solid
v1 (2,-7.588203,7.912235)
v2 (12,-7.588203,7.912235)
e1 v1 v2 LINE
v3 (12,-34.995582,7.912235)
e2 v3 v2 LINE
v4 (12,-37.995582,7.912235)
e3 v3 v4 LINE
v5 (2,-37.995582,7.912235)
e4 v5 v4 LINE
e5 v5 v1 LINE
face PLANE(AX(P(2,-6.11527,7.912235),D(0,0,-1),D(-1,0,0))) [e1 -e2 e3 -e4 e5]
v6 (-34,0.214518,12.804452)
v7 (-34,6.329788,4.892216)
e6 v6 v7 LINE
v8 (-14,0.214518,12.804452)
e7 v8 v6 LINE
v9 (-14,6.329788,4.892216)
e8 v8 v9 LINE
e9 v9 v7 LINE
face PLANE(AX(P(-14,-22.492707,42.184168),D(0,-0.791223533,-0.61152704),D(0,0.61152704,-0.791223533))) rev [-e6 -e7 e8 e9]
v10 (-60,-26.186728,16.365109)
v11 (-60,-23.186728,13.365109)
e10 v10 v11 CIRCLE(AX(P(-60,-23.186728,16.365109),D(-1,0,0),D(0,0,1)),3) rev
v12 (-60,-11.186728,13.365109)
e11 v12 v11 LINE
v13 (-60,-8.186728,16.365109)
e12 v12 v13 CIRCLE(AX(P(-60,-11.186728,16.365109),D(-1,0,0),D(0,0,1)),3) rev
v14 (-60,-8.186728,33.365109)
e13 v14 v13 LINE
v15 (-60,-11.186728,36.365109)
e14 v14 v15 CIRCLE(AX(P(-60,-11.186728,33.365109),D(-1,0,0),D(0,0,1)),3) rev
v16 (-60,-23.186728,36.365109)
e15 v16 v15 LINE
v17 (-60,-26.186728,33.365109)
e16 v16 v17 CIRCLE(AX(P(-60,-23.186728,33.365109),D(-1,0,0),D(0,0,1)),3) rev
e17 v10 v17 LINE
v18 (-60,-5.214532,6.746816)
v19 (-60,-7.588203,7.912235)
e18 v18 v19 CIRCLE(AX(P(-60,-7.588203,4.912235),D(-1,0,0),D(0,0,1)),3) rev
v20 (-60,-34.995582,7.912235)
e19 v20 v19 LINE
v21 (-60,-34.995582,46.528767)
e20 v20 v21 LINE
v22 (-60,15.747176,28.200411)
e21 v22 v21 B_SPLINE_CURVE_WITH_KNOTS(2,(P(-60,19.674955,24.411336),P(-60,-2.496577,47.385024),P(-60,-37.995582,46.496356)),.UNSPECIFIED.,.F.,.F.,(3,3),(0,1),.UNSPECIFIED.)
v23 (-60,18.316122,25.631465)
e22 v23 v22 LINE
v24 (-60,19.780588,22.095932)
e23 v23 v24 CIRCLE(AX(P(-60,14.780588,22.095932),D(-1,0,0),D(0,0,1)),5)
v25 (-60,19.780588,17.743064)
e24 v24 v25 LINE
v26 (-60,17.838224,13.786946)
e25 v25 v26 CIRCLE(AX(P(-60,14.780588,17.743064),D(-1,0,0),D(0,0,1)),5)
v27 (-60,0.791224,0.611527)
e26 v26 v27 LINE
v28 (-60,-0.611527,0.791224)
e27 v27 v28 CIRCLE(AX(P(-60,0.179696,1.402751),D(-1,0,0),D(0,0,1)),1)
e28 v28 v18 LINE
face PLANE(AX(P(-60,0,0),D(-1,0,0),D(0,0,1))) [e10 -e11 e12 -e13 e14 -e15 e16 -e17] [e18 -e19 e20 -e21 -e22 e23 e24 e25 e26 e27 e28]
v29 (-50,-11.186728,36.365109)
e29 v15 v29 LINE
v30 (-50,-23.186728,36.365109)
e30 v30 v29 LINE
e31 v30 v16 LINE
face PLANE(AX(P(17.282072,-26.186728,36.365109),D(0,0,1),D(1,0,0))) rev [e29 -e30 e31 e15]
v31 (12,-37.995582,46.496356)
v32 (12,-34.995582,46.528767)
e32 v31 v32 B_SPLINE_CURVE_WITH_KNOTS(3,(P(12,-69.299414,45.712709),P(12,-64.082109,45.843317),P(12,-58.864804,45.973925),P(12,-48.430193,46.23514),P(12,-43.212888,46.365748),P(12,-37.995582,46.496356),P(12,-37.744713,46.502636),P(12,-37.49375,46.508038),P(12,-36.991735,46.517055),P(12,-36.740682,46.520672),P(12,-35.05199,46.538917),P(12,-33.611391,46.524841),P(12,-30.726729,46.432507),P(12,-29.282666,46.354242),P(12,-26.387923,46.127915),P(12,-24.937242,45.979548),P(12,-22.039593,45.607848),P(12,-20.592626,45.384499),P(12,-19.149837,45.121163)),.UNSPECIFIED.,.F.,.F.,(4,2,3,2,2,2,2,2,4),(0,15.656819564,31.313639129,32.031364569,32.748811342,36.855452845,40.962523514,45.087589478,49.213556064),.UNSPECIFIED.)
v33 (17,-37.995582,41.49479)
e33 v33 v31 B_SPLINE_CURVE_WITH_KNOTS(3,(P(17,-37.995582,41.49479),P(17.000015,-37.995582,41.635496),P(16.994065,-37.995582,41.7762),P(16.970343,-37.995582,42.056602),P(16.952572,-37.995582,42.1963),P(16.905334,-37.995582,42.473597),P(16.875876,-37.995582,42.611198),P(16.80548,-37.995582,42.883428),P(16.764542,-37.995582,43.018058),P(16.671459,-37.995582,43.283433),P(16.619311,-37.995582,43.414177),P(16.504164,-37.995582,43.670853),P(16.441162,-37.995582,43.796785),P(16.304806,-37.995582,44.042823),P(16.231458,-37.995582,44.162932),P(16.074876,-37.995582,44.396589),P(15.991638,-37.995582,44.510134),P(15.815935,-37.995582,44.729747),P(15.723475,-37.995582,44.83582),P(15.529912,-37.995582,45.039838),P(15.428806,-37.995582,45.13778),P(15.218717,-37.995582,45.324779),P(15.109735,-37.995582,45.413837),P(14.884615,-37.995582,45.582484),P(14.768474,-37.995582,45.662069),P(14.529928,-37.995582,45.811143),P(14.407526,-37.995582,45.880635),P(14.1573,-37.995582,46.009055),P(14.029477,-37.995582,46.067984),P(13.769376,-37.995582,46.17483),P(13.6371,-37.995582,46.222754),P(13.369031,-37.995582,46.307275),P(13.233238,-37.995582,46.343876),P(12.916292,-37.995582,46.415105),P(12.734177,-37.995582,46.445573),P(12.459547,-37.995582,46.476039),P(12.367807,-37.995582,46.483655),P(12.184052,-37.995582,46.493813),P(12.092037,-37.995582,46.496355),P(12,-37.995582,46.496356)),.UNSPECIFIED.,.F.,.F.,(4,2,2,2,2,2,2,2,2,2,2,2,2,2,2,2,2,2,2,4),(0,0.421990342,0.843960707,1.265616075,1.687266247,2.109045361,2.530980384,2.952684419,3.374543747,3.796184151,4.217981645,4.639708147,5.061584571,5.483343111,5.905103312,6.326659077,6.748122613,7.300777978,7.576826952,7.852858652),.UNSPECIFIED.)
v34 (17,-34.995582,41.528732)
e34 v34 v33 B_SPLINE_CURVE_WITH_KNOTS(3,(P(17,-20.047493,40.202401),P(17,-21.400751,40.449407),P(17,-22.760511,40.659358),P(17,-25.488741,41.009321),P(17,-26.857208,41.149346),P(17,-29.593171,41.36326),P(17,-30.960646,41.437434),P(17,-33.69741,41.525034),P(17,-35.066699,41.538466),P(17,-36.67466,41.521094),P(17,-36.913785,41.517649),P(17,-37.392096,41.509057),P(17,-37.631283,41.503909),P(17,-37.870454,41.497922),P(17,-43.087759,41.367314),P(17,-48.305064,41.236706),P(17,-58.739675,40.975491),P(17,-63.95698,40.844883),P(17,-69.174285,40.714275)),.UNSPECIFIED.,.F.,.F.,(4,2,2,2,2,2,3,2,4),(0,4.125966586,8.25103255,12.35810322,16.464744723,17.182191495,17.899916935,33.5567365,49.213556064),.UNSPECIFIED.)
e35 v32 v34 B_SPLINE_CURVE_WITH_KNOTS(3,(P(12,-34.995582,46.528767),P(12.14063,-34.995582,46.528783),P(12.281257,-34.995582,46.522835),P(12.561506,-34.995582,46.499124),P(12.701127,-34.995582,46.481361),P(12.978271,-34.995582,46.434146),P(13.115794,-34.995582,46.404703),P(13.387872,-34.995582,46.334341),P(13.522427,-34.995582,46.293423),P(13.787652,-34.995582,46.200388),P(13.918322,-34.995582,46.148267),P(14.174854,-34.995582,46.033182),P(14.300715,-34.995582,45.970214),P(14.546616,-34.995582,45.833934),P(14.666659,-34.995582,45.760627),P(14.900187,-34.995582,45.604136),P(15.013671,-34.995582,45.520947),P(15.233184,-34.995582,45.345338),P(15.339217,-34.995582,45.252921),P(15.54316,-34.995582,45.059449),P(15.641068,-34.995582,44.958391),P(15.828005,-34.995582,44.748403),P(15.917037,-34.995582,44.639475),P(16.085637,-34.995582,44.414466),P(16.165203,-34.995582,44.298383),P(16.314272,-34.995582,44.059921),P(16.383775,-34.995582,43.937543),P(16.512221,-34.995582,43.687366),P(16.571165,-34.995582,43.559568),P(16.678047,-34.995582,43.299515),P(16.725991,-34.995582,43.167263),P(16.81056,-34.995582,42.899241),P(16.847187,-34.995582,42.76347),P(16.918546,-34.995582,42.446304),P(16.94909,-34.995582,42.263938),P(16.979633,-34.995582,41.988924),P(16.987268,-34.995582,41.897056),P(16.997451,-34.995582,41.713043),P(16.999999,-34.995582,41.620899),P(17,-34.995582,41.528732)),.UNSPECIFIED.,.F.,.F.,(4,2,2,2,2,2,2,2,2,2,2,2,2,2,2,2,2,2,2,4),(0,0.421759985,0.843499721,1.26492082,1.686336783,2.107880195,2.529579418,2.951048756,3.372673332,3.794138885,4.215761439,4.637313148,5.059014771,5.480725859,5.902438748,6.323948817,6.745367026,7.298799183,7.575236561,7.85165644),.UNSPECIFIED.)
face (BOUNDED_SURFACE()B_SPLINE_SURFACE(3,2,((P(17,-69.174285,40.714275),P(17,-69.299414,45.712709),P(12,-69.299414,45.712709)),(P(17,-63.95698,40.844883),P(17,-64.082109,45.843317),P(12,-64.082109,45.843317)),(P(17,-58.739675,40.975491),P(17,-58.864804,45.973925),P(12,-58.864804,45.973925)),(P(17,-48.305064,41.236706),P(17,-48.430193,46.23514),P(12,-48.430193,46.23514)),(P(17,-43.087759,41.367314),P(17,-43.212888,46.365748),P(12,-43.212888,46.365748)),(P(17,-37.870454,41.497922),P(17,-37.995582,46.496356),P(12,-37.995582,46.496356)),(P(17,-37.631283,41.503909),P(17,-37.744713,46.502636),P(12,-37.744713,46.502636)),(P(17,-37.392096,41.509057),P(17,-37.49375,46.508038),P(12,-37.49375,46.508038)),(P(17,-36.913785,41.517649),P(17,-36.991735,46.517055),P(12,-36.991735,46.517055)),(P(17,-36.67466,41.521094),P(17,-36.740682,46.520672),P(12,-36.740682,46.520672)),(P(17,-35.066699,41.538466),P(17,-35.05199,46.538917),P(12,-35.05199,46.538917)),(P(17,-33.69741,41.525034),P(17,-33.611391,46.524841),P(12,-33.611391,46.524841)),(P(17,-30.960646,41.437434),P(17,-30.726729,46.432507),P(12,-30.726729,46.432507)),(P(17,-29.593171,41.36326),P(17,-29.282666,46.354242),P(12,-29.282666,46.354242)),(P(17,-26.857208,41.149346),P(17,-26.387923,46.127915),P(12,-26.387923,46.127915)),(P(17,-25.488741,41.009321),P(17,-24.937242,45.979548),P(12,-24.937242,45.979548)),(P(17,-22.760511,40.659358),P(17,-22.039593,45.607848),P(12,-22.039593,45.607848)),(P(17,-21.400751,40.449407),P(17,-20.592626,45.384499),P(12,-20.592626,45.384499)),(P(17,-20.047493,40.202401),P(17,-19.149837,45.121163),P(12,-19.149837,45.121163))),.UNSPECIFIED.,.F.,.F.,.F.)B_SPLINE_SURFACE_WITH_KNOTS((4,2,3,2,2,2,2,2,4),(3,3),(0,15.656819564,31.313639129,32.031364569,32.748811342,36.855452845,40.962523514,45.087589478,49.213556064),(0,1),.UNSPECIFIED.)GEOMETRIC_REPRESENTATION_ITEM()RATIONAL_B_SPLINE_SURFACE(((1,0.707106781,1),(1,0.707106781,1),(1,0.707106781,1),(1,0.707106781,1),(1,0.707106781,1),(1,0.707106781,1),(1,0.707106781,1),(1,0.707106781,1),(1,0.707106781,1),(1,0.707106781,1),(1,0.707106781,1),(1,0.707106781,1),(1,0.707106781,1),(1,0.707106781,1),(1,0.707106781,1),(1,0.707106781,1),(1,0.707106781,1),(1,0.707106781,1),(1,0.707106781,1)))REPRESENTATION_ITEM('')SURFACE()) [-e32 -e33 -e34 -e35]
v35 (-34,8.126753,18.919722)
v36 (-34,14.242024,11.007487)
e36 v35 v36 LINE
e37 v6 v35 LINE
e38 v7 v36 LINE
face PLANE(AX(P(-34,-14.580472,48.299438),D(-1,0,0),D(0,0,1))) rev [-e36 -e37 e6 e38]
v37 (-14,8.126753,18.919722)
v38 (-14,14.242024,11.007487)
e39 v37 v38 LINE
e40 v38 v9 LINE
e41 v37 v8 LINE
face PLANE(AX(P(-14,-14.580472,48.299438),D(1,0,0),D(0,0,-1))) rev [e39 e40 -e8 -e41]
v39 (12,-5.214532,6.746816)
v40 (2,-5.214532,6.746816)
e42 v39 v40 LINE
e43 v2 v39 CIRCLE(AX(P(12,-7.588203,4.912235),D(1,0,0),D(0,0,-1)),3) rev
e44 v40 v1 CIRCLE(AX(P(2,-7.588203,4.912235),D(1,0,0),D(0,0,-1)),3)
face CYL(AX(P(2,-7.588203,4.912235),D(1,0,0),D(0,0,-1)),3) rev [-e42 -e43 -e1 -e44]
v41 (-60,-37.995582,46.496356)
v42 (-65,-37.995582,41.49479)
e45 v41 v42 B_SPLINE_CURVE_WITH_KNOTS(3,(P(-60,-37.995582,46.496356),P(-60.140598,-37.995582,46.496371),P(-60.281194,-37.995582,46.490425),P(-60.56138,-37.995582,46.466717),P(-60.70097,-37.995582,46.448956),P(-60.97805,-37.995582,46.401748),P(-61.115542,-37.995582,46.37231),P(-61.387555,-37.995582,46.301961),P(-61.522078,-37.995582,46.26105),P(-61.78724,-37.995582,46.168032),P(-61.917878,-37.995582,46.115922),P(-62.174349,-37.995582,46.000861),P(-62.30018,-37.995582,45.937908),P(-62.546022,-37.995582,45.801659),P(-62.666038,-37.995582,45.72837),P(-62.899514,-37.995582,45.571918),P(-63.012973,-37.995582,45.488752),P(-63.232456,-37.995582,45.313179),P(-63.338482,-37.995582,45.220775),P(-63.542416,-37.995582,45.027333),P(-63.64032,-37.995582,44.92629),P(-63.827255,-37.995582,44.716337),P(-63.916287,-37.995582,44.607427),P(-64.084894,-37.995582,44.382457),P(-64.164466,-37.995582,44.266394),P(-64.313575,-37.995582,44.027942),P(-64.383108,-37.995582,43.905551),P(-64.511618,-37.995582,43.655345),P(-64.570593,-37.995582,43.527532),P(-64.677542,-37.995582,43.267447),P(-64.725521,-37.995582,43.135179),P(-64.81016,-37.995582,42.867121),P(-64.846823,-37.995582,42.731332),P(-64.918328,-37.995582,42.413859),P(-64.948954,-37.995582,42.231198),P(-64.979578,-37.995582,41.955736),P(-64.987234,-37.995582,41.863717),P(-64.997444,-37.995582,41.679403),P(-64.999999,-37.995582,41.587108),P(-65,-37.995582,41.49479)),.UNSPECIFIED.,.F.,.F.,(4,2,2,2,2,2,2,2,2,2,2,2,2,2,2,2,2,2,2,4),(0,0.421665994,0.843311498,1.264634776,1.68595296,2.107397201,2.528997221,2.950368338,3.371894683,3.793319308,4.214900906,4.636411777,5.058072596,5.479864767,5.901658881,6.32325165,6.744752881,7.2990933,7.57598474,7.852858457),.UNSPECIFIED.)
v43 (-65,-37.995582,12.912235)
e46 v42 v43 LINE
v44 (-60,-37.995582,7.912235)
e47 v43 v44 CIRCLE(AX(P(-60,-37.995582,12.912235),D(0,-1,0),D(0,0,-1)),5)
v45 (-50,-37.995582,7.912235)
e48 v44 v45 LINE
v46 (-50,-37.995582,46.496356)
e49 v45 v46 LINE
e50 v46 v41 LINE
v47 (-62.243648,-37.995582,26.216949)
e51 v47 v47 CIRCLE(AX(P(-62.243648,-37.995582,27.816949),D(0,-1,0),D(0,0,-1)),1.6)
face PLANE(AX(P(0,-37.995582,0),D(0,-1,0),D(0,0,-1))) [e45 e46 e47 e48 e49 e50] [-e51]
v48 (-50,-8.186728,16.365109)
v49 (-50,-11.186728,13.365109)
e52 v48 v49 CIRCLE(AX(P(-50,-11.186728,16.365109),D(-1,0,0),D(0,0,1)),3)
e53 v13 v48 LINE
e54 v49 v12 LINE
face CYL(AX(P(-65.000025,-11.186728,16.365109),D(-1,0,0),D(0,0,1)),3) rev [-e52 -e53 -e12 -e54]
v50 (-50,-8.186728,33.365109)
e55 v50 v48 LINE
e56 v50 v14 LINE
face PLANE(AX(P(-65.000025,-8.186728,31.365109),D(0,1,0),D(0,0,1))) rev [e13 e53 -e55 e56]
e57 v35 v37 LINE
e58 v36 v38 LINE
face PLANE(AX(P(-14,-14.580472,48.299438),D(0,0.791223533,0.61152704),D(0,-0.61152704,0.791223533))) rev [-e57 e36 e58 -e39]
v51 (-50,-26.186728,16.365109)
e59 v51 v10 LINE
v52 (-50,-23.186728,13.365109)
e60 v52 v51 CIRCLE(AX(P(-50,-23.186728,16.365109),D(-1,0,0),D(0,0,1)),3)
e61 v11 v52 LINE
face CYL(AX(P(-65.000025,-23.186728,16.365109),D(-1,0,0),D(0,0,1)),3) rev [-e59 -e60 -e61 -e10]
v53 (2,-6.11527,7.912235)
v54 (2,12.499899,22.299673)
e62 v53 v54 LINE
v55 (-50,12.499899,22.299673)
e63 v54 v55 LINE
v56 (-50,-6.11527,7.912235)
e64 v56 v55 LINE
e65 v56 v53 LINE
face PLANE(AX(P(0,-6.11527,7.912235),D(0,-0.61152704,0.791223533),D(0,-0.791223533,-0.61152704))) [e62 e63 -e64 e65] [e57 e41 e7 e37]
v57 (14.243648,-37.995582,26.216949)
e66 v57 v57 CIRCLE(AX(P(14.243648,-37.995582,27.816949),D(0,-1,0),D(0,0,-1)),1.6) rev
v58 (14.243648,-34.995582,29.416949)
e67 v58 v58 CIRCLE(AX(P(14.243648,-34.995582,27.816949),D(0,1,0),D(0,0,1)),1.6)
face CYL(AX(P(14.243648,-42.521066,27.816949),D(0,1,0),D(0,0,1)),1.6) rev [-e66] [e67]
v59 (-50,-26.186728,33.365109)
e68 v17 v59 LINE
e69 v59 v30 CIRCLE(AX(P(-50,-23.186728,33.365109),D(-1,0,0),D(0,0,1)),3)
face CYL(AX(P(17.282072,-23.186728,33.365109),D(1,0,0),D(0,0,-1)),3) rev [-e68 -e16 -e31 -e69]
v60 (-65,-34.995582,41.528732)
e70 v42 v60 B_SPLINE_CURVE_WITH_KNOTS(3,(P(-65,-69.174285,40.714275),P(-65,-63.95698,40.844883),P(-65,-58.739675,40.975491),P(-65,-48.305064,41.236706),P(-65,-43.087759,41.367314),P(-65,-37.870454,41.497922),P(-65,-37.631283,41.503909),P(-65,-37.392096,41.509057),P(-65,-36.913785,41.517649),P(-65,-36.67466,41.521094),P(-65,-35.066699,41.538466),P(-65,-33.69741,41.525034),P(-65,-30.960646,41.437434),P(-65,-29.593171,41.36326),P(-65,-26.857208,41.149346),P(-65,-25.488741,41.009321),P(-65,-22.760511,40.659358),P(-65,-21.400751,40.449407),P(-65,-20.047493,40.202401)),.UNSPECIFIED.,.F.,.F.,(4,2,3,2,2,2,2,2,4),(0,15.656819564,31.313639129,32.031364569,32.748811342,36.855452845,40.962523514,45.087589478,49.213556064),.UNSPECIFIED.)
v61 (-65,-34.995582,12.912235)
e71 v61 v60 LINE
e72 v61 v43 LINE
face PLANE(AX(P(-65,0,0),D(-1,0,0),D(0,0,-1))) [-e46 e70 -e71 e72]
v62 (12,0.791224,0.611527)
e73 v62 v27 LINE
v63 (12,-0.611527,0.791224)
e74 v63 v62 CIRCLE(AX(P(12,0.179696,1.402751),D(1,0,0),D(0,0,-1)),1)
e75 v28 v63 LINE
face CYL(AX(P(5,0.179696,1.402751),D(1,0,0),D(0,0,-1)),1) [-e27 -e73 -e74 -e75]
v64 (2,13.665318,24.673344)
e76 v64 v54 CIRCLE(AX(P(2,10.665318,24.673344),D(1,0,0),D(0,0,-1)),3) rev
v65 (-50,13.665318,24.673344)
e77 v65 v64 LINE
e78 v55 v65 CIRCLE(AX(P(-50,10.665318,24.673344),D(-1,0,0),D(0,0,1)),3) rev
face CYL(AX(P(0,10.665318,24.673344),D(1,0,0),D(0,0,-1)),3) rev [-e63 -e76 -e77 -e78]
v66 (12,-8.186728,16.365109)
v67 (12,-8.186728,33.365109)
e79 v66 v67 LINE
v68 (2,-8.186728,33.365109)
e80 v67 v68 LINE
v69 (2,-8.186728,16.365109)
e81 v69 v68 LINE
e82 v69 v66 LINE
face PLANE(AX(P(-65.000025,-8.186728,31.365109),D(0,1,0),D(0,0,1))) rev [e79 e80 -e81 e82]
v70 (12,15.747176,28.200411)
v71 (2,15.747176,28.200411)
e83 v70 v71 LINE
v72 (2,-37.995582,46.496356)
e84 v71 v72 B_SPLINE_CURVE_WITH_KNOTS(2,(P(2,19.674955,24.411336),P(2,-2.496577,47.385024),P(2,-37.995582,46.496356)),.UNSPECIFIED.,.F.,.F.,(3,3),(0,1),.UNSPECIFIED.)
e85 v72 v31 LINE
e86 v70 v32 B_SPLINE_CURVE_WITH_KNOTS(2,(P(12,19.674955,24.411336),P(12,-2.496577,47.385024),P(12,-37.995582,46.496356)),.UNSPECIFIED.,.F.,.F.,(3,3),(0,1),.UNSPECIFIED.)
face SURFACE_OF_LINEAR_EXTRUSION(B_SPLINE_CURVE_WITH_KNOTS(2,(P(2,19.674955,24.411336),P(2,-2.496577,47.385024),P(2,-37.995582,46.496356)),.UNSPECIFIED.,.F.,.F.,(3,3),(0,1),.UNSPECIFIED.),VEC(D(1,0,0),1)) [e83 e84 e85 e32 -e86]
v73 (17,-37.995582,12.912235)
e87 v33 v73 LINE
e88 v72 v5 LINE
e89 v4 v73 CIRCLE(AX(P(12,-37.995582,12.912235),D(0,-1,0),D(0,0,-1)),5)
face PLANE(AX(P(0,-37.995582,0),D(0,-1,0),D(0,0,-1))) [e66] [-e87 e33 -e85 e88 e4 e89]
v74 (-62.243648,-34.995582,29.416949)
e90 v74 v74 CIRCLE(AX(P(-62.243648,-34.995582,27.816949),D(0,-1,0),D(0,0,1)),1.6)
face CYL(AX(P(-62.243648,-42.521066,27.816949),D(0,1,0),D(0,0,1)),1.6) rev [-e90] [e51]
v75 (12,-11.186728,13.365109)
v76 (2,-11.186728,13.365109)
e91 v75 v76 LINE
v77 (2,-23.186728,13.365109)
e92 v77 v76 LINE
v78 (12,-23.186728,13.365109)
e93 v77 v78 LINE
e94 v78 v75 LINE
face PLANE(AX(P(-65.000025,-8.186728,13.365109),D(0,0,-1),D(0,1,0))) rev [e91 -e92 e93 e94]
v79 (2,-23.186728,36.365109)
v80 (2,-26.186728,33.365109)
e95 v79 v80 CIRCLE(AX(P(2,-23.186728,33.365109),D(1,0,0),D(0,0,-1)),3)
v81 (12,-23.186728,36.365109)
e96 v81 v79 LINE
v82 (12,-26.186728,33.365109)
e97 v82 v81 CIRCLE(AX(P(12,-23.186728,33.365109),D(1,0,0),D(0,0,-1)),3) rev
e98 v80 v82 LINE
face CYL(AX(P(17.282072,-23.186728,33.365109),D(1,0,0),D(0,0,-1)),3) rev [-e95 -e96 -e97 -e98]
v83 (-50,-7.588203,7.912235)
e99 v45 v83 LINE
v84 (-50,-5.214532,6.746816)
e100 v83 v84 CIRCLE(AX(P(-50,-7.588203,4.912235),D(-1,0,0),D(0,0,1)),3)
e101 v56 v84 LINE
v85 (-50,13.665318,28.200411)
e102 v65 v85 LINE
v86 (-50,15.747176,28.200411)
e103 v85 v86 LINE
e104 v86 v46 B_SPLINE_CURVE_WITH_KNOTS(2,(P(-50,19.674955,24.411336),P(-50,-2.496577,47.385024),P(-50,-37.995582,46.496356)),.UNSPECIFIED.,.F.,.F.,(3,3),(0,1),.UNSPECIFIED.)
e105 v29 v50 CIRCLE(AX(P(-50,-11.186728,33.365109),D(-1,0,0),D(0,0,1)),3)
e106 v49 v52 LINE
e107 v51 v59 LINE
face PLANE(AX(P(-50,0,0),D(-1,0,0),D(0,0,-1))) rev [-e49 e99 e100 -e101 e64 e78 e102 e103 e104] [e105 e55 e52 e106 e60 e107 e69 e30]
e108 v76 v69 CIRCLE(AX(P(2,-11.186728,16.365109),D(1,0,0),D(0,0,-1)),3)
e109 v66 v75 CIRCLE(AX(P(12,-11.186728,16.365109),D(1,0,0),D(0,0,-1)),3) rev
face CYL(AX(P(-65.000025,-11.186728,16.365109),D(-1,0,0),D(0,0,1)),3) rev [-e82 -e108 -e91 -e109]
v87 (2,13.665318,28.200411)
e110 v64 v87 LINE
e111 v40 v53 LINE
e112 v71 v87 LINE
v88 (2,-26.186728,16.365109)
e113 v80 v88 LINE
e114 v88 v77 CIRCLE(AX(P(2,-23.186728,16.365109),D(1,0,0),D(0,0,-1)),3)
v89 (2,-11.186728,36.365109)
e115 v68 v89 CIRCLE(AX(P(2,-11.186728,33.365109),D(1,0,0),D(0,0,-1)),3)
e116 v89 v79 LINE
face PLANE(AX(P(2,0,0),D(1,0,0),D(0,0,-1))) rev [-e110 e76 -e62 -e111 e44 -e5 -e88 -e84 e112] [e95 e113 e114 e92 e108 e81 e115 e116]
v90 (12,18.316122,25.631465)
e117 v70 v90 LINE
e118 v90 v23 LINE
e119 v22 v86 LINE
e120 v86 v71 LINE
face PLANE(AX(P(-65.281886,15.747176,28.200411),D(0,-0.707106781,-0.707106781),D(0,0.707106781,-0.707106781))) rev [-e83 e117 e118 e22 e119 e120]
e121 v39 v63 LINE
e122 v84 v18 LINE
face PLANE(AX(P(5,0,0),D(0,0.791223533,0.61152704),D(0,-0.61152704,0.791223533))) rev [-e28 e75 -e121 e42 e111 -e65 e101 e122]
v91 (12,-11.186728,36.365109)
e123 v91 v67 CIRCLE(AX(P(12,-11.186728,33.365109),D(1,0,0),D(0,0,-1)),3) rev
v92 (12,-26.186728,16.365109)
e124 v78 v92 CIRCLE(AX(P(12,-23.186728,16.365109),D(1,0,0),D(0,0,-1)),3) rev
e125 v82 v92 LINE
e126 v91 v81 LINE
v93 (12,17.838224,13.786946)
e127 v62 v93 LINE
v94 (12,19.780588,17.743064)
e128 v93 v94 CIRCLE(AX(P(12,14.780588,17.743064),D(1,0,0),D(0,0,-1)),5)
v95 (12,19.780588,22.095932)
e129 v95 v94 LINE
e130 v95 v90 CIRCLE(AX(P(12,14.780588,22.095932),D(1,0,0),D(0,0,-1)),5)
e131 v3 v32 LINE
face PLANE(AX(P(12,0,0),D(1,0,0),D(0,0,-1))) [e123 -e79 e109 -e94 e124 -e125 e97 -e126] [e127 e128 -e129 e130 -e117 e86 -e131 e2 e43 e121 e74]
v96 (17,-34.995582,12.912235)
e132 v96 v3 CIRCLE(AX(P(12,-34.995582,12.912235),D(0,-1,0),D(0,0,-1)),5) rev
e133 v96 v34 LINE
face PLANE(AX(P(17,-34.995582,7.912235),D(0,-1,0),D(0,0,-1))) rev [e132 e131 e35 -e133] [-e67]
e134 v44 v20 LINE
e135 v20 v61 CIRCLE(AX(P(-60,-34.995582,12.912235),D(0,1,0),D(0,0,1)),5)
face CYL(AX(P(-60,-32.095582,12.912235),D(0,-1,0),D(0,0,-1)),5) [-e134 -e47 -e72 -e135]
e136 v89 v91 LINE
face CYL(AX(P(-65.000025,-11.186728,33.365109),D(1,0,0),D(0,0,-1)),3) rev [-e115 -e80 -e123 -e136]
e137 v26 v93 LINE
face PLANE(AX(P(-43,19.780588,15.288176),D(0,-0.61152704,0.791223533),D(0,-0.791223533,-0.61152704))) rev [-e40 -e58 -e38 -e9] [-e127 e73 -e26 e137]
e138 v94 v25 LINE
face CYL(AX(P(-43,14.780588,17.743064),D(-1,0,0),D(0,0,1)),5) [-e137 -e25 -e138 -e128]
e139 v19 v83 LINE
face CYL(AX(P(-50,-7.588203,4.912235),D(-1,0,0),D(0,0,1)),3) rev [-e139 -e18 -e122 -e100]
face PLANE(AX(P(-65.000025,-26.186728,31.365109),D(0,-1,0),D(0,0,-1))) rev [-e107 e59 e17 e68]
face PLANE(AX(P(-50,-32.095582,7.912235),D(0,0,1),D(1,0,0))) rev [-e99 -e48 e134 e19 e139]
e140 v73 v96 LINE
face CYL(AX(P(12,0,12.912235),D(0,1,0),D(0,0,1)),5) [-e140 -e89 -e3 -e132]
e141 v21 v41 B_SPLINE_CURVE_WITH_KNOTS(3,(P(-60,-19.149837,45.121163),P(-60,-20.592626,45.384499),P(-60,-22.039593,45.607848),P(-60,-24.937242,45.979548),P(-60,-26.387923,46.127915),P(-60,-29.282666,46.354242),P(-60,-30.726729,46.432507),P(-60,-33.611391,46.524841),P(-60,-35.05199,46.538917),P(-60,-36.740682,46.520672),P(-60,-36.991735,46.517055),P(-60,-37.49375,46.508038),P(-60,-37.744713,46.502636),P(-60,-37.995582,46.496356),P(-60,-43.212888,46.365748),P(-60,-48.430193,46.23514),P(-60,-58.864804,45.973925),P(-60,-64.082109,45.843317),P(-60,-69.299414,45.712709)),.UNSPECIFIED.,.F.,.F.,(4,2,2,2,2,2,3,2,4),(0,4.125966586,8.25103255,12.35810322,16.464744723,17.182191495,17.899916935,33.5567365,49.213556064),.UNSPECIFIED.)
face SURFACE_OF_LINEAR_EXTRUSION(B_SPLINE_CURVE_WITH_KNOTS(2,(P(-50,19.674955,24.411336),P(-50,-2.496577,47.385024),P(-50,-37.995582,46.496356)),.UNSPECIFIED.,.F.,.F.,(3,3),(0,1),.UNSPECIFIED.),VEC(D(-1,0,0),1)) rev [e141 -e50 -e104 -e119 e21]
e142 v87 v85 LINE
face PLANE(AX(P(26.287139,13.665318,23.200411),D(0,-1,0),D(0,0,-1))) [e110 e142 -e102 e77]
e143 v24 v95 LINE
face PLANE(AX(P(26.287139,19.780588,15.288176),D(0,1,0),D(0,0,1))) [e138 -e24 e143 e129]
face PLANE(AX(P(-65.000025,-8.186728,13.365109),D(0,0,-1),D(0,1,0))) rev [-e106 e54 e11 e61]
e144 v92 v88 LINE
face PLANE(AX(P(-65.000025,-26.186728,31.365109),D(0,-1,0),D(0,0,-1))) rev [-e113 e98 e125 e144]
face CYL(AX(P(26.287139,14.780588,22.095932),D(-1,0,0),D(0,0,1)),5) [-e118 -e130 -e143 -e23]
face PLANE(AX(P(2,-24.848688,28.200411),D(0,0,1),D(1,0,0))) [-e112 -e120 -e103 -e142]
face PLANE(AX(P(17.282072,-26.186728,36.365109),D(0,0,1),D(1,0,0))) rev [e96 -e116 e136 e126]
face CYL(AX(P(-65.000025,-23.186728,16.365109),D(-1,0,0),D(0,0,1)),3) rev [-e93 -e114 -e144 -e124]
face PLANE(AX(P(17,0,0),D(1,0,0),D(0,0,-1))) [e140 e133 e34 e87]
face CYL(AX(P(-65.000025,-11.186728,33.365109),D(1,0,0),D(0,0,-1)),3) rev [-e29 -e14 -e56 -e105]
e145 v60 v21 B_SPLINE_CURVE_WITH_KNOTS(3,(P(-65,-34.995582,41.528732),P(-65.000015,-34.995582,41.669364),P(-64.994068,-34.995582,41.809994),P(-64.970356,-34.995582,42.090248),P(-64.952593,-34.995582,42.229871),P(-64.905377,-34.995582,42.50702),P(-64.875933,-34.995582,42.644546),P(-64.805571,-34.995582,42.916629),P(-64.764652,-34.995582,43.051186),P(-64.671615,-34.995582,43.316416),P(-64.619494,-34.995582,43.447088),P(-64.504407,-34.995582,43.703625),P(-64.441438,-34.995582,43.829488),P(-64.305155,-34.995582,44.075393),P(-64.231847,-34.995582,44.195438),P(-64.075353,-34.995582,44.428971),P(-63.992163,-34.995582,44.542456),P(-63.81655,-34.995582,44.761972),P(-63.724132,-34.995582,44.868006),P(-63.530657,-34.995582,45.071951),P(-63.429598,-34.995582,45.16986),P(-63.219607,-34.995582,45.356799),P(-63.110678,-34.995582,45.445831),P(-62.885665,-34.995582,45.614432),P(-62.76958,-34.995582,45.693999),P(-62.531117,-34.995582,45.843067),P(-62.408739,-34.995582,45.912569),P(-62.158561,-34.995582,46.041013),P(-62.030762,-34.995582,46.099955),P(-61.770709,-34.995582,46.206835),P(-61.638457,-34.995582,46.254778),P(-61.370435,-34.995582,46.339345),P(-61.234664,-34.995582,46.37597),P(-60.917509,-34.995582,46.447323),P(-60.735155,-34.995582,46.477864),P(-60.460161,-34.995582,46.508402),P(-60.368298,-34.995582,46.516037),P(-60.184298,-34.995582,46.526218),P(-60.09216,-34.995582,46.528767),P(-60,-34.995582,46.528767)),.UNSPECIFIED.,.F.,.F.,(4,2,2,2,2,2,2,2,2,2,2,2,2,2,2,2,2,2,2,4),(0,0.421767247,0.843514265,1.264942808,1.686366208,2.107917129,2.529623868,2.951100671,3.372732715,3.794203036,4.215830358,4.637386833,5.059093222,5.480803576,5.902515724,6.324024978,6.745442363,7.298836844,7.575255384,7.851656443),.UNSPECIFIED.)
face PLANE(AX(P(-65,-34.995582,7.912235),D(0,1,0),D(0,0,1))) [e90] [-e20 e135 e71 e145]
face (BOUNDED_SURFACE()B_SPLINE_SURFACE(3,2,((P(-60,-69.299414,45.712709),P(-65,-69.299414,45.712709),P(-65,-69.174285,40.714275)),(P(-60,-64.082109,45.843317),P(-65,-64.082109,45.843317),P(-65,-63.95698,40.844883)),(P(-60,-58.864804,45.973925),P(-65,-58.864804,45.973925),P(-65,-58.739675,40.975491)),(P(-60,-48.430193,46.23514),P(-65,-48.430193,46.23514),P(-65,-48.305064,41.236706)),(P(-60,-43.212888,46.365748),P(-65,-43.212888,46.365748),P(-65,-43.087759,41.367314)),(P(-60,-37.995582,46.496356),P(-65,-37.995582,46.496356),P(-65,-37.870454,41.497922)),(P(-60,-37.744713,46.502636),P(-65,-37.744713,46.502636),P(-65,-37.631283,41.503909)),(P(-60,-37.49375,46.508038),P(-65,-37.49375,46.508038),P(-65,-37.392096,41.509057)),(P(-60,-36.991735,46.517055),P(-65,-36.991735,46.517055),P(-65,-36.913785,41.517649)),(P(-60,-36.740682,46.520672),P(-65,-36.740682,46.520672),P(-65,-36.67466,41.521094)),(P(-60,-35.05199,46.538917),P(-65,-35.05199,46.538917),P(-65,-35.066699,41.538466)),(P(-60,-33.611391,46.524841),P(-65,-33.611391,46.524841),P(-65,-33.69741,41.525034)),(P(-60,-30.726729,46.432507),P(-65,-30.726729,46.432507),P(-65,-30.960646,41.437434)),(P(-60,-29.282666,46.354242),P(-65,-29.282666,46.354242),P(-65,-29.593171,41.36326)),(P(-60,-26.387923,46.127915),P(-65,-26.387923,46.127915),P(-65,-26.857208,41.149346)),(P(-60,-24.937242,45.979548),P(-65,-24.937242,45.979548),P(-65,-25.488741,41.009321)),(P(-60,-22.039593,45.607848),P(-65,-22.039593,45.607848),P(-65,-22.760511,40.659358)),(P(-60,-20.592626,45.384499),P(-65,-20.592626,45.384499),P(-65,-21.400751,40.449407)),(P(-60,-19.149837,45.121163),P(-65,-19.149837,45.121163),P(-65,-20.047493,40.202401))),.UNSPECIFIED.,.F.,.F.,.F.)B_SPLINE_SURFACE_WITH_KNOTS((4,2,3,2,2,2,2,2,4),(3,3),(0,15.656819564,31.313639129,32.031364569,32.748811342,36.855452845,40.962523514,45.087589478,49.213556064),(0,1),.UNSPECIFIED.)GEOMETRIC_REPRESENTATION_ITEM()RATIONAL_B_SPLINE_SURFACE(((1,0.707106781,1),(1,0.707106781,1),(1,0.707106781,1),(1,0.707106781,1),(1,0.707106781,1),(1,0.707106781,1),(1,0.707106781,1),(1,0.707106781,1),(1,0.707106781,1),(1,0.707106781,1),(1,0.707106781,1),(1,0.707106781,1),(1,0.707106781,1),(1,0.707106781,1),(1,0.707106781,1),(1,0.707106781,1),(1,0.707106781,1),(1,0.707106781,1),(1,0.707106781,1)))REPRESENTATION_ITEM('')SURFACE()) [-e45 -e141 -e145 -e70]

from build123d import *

# Parameters (mm, degrees)
EXTRUDE_1_DEPTH     = 5
SKETCH_2_W          = 5
SKETCH_2_H          = 25
EXTRUDE_2_DEPTH     = 10
EXTRUDE_3_DEPTH     = 43
EXTRUDE_4_DEPTH     = 10
CUT_EXTRUDE_1_DEPTH = 58
EXTRUDE_5_DEPTH     = 7
EXTRUDE_6_DEPTH     = 7
EXTRUDE_7_DEPTH     = 10
EXTRUDE_8_DEPTH     = 72
SKETCH_10_W         = 10
SKETCH_10_H         = 20.288176
EXTRUDE_9_DEPTH     = 5.9
FILLET_START        = -61
FILLET_1_DEPTH      = 74
FILLET_START_2      = -53.20464
FILLET_1_2_DEPTH    = 57.6
FILLET_START_3      = -60
FILLET_1_3_DEPTH    = 10
FILLET_START_4      = 2
FILLET_1_4_DEPTH    = 10
SKETCH_11_W         = 20.288176
SKETCH_11_H         = 3
EXTRUDE_10_DEPTH    = 5
SKETCH_12_R         = 1.6
CUT_EXTRUDE_2_DEPTH = 3
FILLET_3_R          = 1
SKETCH_13_W         = 15
SKETCH_13_H         = 3
EXTRUDE_11_DEPTH    = 2
CUT_EXTRUDE_3_REACH = 83.122
SKETCH_14_W         = 20
SKETCH_14_H         = 10
EXTRUDE_12_DEPTH    = 10
EXTRUDE_START       = 2
EXTRUDE_13_DEPTH    = 15
SKETCH_20_W         = 18
SKETCH_20_H         = 18
CUT_EXTRUDE_5_DEPTH = 98.660914
FILLET_7_R          = 5
CUT_EXTRUDE_6_DEPTH = 98.660914
FILLET_8_R          = 5
FILLET_9_R          = 5
SKETCH_22_W         = 5
SKETCH_22_H         = 18
CUT_EXTRUDE_7_DEPTH = 98.660914
FILLET_10_R         = 3
CUT_EXTRUDE_8_REACH = 98.904
SKETCH_23_R         = 1.6


with BuildPart() as part:
    # 草图1 → 凸台-拉伸1 (new body)
    with BuildSketch(Plane(origin=(0, 0, 0), x_dir=(0, 0, -1), z_dir=(1, 0, 0))):
        Polygon((0, 0), (11.868353, 9.172906), (-3.419823, 28.953494), (-15.288176, 19.780588), align=None)
    extrude(amount=EXTRUDE_1_DEPTH)

    # 草图2 → 凸台-拉伸2 (add)
    with BuildSketch(Plane(origin=(0, 0, 0), x_dir=(1, 0, 0), z_dir=(0, -0.6115270401858328, 0.7912235329674888))):
        with Locations((2.5, 12.5)):
            Rectangle(SKETCH_2_W, SKETCH_2_H)
    extrude(amount=EXTRUDE_2_DEPTH)

    # 草图3 → 凸台-拉伸3 (add)
    with BuildSketch(Plane.ZY):
        Polygon((23.200411, 13.665318), (15.288176, 19.780588), (0, 0), (7.912235, -6.11527), align=None)
    extrude(amount=EXTRUDE_3_DEPTH)

    # 草图4 → 凸台-拉伸4 (add)
    with BuildSketch(Plane.ZY.offset(43)):
        Polygon((15.288176, 19.780588), (3.419823, 28.953494), (-11.868353, 9.172906), (0, 0), (7.912235, -6.11527), (23.200411, 13.665318), align=None)
    extrude(amount=EXTRUDE_4_DEPTH)

    # 草图5 → 切除-拉伸1 (cut)
    with BuildSketch(Plane.ZY.offset(53)):
        Polygon((15.288176, 19.780588), (3.419823, 28.953494), (-11.868353, 9.172906), (0, 0), align=None)
    extrude(amount=-CUT_EXTRUDE_1_DEPTH, mode=Mode.SUBTRACT)

    # 草图6 → 凸台-拉伸5 (add)
    with BuildSketch(Plane.ZY.offset(53)):
        Polygon((15.288176, 19.780588), (0, 0), (7.912235, -6.11527), (23.200411, 13.665318), align=None)
    extrude(amount=EXTRUDE_5_DEPTH)

    # 草图7 → 凸台-拉伸6 (add)
    with BuildSketch(Plane(origin=(5, 0, 0), x_dir=(0, 0, -1), z_dir=(1, 0, 0))):
        Polygon((0, 0), (-15.288176, 19.780588), (-23.200411, 13.665318), (-7.912235, -6.11527), align=None)
    extrude(amount=EXTRUDE_6_DEPTH)

    # 草图8 → 凸台-拉伸7 (add)
    with BuildSketch(Plane(origin=(12, 0, 0), x_dir=(0, 0, -1), z_dir=(1, 0, 0))):
        Polygon((-23.200411, 13.665318), (-28.200411, 13.665318), (-28.200411, -24.848688), (-28.200411, -32.095582), (-7.912235, -32.095582), (-7.912235, -24.848688), (-7.912235, -6.11527), align=None)
    extrude_7 = extrude(amount=-EXTRUDE_7_DEPTH)

    # 镜向1: 凸台-拉伸7 across plane
    add(extrude_7.mirror(Plane.ZY.offset(24)))

    # 草图9 → 凸台-拉伸8 (add)
    with BuildSketch(Plane.ZY.offset(60)):
        Polygon((23.200411, 13.665318), (28.200411, 13.665318), (28.200411, 19.780588), (15.288176, 19.780588), align=None)
    extrude(amount=-EXTRUDE_8_DEPTH)

    # 草图10 → 凸台-拉伸9 (add)
    with BuildSketch(Plane.XZ.offset(32.095582)):
        with Locations((7, 18.056323)):
            Rectangle(SKETCH_10_W, SKETCH_10_H)
        with Locations((-55, 18.056323)):
            Rectangle(SKETCH_10_W, SKETCH_10_H)
    extrude(amount=EXTRUDE_9_DEPTH)

    # 圆角1: read off the stored shape, not the designer's step
    # 圆角1 outline → 圆角1 (cut)
    with BuildSketch(Plane.YZ.offset(FILLET_START)):
        with BuildLine():
            Line((19.780588, 28.200411), (16.780588, 28.200411))
            ThreePointArc((16.780588, 28.200411), (18.901909, 27.321732), (19.780588, 25.200411))
            Line((19.780588, 25.200411), (19.780588, 28.200411))
        make_face()
    extrude(amount=FILLET_1_DEPTH, mode=Mode.SUBTRACT)

    # Fillet 1 2 outline → Fillet 1 2 (add)
    with BuildSketch(Plane.YZ.offset(FILLET_START_2)):
        with BuildLine():
            ThreePointArc((13.665318, 24.673344), (13.358248, 23.351176), (12.499899, 22.299673))
            Line((12.499899, 22.299673), (13.665318, 23.200411))
            Line((13.665318, 23.200411), (13.665318, 24.673344))
        make_face()
    extrude(amount=FILLET_1_2_DEPTH)

    # Fillet 1 3 outline → Fillet 1 3 (add)
    with BuildSketch(Plane.YZ.offset(FILLET_START_3)):
        with BuildLine():
            ThreePointArc((-7.588203, 7.912235), (-6.266035, 7.605165), (-5.214532, 6.746816))
            Line((-5.214532, 6.746816), (-6.11527, 7.912235))
            Line((-6.11527, 7.912235), (-7.588203, 7.912235))
        make_face()
    extrude(amount=FILLET_1_3_DEPTH)

    # Fillet 1 4 outline → Fillet 1 4 (add)
    with BuildSketch(Plane.YZ.offset(FILLET_START_4)):
        with BuildLine():
            ThreePointArc((-7.588203, 7.912235), (-6.266035, 7.605165), (-5.214532, 6.746816))
            Line((-5.214532, 6.746816), (-6.11527, 7.912235))
            Line((-6.11527, 7.912235), (-7.588203, 7.912235))
        make_face()
    extrude(amount=FILLET_1_4_DEPTH)

    # 草图11 → 凸台-拉伸10 (add)
    with BuildSketch(Plane(origin=(12, 0, 0), x_dir=(0, 0, -1), z_dir=(1, 0, 0))):
        with Locations((-18.056323, -36.495582)):
            Rectangle(SKETCH_11_W, SKETCH_11_H)
    extrude_10 = extrude(amount=EXTRUDE_10_DEPTH)

    # 草图12 → 切除-拉伸2 (cut)
    with BuildSketch(Plane(origin=(0, -34.995582, 0), x_dir=(1, 0, 0), z_dir=(0, 1, 0))):
        with Locations((14.243648, -27.816949)):
            Circle(SKETCH_12_R)
    cut_extrude_2 = extrude(amount=-CUT_EXTRUDE_2_DEPTH, mode=Mode.SUBTRACT)

    # 镜向2: 凸台-拉伸10, 切除-拉伸2 across plane
    add(extrude_10.mirror(Plane.ZY.offset(24)))
    add(cut_extrude_2.mirror(Plane.ZY.offset(24)), mode=Mode.SUBTRACT)

    # 圆角3
    fillet_3_edges = [part.edges().sort_by_distance(p)[0] for p in [
        (-24, 0, 0),
    ]]
    fillet(fillet_3_edges, radius=FILLET_3_R)

    # 草图13 → 凸台-拉伸11 (add)
    with BuildSketch(Plane.XY.offset(28.200411)):
        with Locations((-57.5, -36.495582)):
            Rectangle(SKETCH_13_W, SKETCH_13_H)
        with Locations((9.5, -36.495582)):
            Rectangle(SKETCH_13_W, SKETCH_13_H)
    extrude(amount=EXTRUDE_11_DEPTH)

    # 草图14 → 切除-拉伸3 (cut, up to next)
    with BuildSketch(Plane(origin=(0, 0, 0), x_dir=(-1, 0, 0), z_dir=(0, 0.6115270401858329, -0.7912235329674886)), mode=Mode.PRIVATE) as cut_extrude_3_sk1:
        with Locations((24, 13)):
            Rectangle(SKETCH_14_W, SKETCH_14_H)
    cut_extrude_3_tool1 = extrude(cut_extrude_3_sk1.sketch, amount=-CUT_EXTRUDE_3_REACH, mode=Mode.PRIVATE) & part.part
    add(cut_extrude_3_tool1.solids().sort_by_distance((-24, 10.285906, 7.949852))[0], mode=Mode.SUBTRACT)

    # 草图18 → 凸台-拉伸12 (add)
    with BuildSketch(Plane(origin=(12, 0, 0), x_dir=(0, 0, -1), z_dir=(1, 0, 0))):
        with BuildLine():
            Line((-24.411336, 19.674955), (-24.411336, -37.995582))
            Line((-24.411336, -37.995582), (-46.496356, -37.995582))
            add(Edge.make_bspline(
                [(-24.411336, 19.674955), (-47.385024, -2.496577), (-46.496356, -37.995582)],
                knots=[0, 0, 0, 1, 1, 1], degree=2))
        make_face()
    extrude_12 = extrude(amount=-EXTRUDE_12_DEPTH)

    # 凸台-拉伸13: read off the stored shape, not the designer's step
    # 凸台-拉伸13 outline → 凸台-拉伸13 (add)
    with BuildSketch(Plane.YZ.offset(EXTRUDE_START)):
        with BuildLine():
            Line((-34.995582, 30.200411), (-34.995582, 46.528767))
            add(Edge.make_bspline(
                [(-34.995582, 46.528767), (-36.483492, 46.534209), (-37.995582, 46.496356)],
                knots=[0.957405, 0.957405, 0.957405, 1, 1, 1], degree=2))
            Line((-37.995582, 46.496356), (-37.995582, 30.200411))
            Line((-37.995582, 30.200411), (-34.995582, 30.200411))
        make_face()
    extrude_13 = extrude(amount=EXTRUDE_13_DEPTH)

    # 镜向3: 凸台-拉伸12, 凸台-拉伸13 across plane
    add(extrude_12.mirror(Plane.ZY.offset(24)))
    add(extrude_13.mirror(Plane.ZY.offset(24)))

    # 草图20 → 切除-拉伸5 (cut, through all)
    with BuildSketch(Plane(origin=(12, 0, 0), x_dir=(0, 0, -1), z_dir=(1, 0, 0))):
        with Locations((-22.365109, -17.186728)):
            Rectangle(SKETCH_20_W, SKETCH_20_H)
    extrude(amount=-CUT_EXTRUDE_5_DEPTH, mode=Mode.SUBTRACT)

    # 圆角7
    fillet_7_edges = [part.edges().sort_by_distance(p)[0] for p in [
        (17, -36.489537, 46.523386),
        (-65, -36.495582, 7.912235),
        (17, -36.495582, 7.912235),
        (-65, -36.489537, 46.523386),
    ]]
    fillet(fillet_7_edges, radius=FILLET_7_R - 0.0001)  # a hair under: the kernel refuses the full size

    # 草图21 → 切除-拉伸6 (cut, through all)
    with BuildSketch(Plane(origin=(12, 0, 0), x_dir=(0, 0, -1), z_dir=(1, 0, 0))):
        with BuildLine():
            Line((-28.200411, 15.747176), (-24.166999, 19.780588))
            Line((-24.166999, 19.780588), (-25.200411, 19.780588))
            ThreePointArc((-25.200411, 19.780588), (-27.321732, 18.901909), (-28.200411, 16.780588))
            Line((-28.200411, 16.780588), (-28.200411, 15.747176))
        make_face()
    extrude(amount=-CUT_EXTRUDE_6_DEPTH, mode=Mode.SUBTRACT)

    # 圆角8
    fillet_8_edges = [part.edges().sort_by_distance(p)[0] for p in [
        (-24, 19.780588, 24.166999),
    ]]
    fillet(fillet_8_edges, radius=FILLET_8_R)

    # 圆角9
    fillet_9_edges = [part.edges().sort_by_distance(p)[0] for p in [
        (-24, 19.780588, 15.288176),
    ]]
    fillet(fillet_9_edges, radius=FILLET_9_R)

    # 草图22 → 切除-拉伸7 (cut, through all)
    with BuildSketch(Plane.ZY.offset(60)):
        with Locations((33.865109, -17.186728)):
            Rectangle(SKETCH_22_W, SKETCH_22_H)
    extrude(amount=-CUT_EXTRUDE_7_DEPTH, mode=Mode.SUBTRACT)

    # 圆角10
    fillet_10_edges = [part.edges().sort_by_distance(p)[0] for p in [
        (7, -8.186728, 13.365109),
        (-55, -8.186728, 13.365109),
        (7, -26.186728, 13.365109),
        (-55, -26.186728, 13.365109),
        (7, -8.186728, 36.365109),
        (-55, -8.186728, 36.365109),
        (7, -26.186728, 36.365109),
        (-55, -26.186728, 36.365109),
    ]]
    fillet(fillet_10_edges, radius=FILLET_10_R)

    # 草图23 → 切除-拉伸8 (cut, up to next)
    with BuildSketch(Plane(origin=(0, -34.995582, 0), x_dir=(1, 0, 0), z_dir=(0, 1, 0)), mode=Mode.PRIVATE) as cut_extrude_8_sk1:
        with Locations(Location((14.243648, -27.816949, 0), (0, 0, 270))):
            Circle(SKETCH_23_R)
    cut_extrude_8_tool1 = extrude(cut_extrude_8_sk1.sketch, amount=-CUT_EXTRUDE_8_REACH, mode=Mode.PRIVATE) & part.part
    # 草图23 → 切除-拉伸8 (cut, up to next)
    with BuildSketch(Plane(origin=(0, -34.995582, 0), x_dir=(1, 0, 0), z_dir=(0, 1, 0)), mode=Mode.PRIVATE) as cut_extrude_8_sk2:
        with Locations(Location((-62.243648, -27.816949, 0), (0, 0, 270))):
            Circle(SKETCH_23_R)
    cut_extrude_8_tool2 = extrude(cut_extrude_8_sk2.sketch, amount=-CUT_EXTRUDE_8_REACH, mode=Mode.PRIVATE) & part.part
    add(cut_extrude_8_tool1.solids().sort_by_distance((14.243648, -34.995582, 27.816949))[0], mode=Mode.SUBTRACT)
    add(cut_extrude_8_tool2.solids().sort_by_distance((-62.243648, -34.995582, 27.816949))[0], mode=Mode.SUBTRACT)


solid = part.part
